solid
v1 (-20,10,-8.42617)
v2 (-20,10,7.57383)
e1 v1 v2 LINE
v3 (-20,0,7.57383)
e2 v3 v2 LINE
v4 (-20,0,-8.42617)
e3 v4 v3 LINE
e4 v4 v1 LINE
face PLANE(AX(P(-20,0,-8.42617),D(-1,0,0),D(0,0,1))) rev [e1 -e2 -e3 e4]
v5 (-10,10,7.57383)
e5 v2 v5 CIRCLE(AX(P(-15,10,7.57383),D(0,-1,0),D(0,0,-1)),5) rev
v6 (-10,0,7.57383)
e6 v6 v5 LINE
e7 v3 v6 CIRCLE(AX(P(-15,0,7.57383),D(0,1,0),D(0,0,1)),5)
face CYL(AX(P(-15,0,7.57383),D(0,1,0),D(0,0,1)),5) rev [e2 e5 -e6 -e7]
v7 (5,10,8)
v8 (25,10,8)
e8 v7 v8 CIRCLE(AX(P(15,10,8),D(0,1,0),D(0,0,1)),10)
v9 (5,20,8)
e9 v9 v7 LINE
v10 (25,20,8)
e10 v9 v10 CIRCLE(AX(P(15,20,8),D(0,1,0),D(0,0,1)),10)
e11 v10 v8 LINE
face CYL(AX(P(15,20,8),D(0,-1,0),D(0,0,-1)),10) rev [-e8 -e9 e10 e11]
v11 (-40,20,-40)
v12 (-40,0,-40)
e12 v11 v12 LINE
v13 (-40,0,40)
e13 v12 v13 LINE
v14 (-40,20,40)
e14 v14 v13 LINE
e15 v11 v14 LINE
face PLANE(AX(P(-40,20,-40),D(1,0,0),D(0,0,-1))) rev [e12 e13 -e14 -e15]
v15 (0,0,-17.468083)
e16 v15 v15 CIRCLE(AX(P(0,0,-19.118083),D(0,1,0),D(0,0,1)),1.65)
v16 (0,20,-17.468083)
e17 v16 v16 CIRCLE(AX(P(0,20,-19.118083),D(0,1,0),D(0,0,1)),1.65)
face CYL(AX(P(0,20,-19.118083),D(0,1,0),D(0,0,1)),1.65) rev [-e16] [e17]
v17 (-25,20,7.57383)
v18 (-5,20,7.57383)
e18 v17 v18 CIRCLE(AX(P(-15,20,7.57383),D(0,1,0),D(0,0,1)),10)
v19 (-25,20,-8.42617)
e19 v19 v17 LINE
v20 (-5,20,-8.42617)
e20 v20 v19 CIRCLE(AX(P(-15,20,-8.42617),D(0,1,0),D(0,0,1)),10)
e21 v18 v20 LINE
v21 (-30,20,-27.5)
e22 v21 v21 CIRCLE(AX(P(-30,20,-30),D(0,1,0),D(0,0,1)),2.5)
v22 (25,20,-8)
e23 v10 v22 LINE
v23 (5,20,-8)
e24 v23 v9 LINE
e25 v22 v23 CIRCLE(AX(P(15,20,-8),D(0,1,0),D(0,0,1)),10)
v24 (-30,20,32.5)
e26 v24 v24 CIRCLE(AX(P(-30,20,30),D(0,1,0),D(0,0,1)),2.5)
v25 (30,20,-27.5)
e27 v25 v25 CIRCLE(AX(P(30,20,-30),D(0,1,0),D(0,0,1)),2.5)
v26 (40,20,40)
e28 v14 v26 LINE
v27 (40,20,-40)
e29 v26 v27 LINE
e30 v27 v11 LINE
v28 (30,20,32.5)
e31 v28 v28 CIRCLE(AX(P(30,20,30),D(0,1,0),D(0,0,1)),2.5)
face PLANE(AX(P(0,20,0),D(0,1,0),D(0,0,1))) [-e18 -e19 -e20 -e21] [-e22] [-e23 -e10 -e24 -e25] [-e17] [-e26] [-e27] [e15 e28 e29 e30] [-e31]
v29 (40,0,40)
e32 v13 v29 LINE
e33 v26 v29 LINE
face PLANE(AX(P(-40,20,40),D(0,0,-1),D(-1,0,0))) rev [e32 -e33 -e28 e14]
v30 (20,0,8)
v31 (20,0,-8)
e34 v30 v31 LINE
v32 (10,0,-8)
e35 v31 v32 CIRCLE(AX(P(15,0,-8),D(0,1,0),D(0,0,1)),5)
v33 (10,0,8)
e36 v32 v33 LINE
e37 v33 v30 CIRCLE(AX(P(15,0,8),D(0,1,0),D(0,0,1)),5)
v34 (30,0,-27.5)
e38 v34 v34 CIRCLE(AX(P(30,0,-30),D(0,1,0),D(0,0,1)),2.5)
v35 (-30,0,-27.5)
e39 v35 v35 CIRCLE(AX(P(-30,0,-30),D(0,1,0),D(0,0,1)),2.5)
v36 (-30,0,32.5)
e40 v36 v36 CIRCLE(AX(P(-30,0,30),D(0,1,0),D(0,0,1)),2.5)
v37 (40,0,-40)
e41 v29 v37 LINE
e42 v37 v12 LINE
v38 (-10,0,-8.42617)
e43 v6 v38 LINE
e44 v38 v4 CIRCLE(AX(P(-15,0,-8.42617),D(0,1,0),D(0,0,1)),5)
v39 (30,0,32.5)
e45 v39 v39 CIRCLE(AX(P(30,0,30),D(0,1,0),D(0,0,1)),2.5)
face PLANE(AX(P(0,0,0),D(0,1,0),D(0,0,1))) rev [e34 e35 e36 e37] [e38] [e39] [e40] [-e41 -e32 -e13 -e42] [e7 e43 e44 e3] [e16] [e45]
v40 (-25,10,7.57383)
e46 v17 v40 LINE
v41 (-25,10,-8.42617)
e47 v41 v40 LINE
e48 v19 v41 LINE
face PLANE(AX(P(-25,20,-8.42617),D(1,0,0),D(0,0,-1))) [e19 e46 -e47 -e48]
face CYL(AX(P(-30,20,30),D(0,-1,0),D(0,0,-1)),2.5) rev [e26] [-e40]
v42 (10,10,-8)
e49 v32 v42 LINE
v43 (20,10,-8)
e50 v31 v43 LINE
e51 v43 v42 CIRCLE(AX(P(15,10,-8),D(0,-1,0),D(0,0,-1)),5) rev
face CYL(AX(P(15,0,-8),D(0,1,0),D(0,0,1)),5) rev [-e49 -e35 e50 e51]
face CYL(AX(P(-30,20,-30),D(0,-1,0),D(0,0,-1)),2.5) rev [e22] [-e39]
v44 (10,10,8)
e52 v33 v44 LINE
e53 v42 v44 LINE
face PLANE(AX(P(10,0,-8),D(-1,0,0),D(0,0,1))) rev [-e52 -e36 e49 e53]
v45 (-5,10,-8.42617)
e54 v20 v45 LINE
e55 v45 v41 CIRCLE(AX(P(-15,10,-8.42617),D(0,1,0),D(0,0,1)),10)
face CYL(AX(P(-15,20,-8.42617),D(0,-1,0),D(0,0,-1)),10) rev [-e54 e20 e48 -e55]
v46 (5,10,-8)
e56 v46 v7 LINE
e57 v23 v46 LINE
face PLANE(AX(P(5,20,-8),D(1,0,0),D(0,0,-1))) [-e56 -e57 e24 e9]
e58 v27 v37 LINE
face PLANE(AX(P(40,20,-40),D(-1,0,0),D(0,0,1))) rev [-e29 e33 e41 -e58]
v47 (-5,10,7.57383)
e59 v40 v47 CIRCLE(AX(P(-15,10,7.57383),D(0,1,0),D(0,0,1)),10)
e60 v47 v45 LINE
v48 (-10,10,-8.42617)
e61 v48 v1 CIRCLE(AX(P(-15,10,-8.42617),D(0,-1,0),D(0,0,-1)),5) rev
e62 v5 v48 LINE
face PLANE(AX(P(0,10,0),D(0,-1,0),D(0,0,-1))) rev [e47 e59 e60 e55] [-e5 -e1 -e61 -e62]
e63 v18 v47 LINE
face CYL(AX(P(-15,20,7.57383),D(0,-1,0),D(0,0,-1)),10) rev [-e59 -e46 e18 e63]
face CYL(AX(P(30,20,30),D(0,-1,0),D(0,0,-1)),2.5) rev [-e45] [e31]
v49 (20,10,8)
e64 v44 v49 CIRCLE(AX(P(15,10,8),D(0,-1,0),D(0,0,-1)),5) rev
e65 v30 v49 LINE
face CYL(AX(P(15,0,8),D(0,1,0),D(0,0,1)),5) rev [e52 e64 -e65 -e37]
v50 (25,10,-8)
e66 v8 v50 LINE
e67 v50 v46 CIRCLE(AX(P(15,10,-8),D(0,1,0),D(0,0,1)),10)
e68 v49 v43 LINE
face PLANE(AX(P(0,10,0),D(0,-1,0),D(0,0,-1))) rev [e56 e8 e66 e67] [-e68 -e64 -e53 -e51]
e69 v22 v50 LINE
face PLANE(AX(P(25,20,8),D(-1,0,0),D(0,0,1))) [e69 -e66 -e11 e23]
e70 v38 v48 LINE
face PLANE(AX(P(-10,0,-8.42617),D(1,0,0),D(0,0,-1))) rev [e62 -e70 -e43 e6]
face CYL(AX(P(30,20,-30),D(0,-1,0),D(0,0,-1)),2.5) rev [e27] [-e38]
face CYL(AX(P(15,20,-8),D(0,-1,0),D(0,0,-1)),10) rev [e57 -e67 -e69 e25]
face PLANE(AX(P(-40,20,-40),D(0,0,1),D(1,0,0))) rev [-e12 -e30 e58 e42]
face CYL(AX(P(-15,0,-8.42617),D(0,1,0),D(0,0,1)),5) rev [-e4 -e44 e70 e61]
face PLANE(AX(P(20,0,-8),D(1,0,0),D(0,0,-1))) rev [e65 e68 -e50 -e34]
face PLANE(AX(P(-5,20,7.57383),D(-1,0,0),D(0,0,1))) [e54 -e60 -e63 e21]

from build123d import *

# Parameters (mm, degrees)
IZIM1_W                     = 80
IZIM1_H                     = 80
IZIM1_R                     = 2.5
Y_KSEKLIK_EKSTR_ZYON1_DEPTH = 20
KES_EKSTR_ZYON2_DEPTH       = 61
KES_EKSTR_ZYON3_START       = 10
KES_EKSTR_ZYON3_DEPTH       = 10
M4X0_7_DI_LI_DELIK1_D       = 3.3


# Read off the part's stored shape, not the designer's step: Kes-Ekstrüzyon3
with BuildPart() as part:
    # Çizim1 → Yükseklik-Ekstrüzyon1 (new body)
    with BuildSketch(Plane(origin=(0, 0, 0), x_dir=(1, 0, 0), z_dir=(0, 1, 0))):
        Rectangle(IZIM1_W, IZIM1_H)
        with Locations(Location((-30, 30, 0), (0, 0, 270))):
            Circle(IZIM1_R, mode=Mode.SUBTRACT)
        with Locations(Location((30, 30, 0), (0, 0, 270))):
            Circle(IZIM1_R, mode=Mode.SUBTRACT)
        with Locations(Location((-30, -30, 0), (0, 0, 270))):
            Circle(IZIM1_R, mode=Mode.SUBTRACT)
        with Locations(Location((30, -30, 0), (0, 0, 270))):
            Circle(IZIM1_R, mode=Mode.SUBTRACT)
    extrude(amount=Y_KSEKLIK_EKSTR_ZYON1_DEPTH)

    # Çizim2 → Kes-Ekstrüzyon2 (cut, through all)
    with BuildSketch(Plane(origin=(0, 20, 0), x_dir=(1, 0, 0), z_dir=(0, 1, 0))):
        with BuildLine():
            Line((-10, 8.426169555), (-10, -7.573830445))
            ThreePointArc((-10, -7.573830445), (-15, -12.573830445), (-20, -7.573830445))
            Line((-20, -7.573830445), (-20, 8.426169555))
            ThreePointArc((-20, 8.426169555), (-15, 13.426169555), (-10, 8.426169555))
        make_face()
        with BuildLine():
            Line((20, 8), (20, -8))
            ThreePointArc((20, -8), (15, -13), (10, -8))
            Line((10, -8), (10, 8))
            ThreePointArc((10, 8), (15, 13), (20, 8))
        make_face()
    extrude(amount=-KES_EKSTR_ZYON2_DEPTH, mode=Mode.SUBTRACT)

    # Kes-Ekstrüzyon3 outline → Kes-Ekstrüzyon3 (cut)
    # profile 1 of 2: a face of its own
    with BuildSketch(Plane(origin=(0, 0, 0), x_dir=(1, 0, 0), z_dir=(0, 1, 0)).offset(KES_EKSTR_ZYON3_START)):
        with BuildLine():
            Line((-25, 8.426169555), (-25, -7.573830445))
            ThreePointArc((-25, -7.573830445), (-15, -17.573830445), (-5, -7.573830445))
            Line((-5, -7.573830445), (-5, 8.426169555))
            ThreePointArc((-5, 8.426169555), (-15, 18.426169555), (-25, 8.426169555))
        make_face()
        with BuildLine():
            ThreePointArc((-20, 8.426169555), (-15, 13.426169555), (-10, 8.426169555))
            Line((-10, 8.426169555), (-10, -7.573830445))
            ThreePointArc((-10, -7.573830445), (-15, -12.573830445), (-20, -7.573830445))
            Line((-20, -7.573830445), (-20, 8.426169555))
        make_face(mode=Mode.SUBTRACT)
    # profile 2 of 2: a face of its own
    with BuildSketch(Plane(origin=(0, 0, 0), x_dir=(1, 0, 0), z_dir=(0, 1, 0)).offset(KES_EKSTR_ZYON3_START)):
        with BuildLine():
            Line((25, -8), (25, 8))
            ThreePointArc((25, 8), (15, 18), (5, 8))
            Line((5, 8), (5, -8))
            ThreePointArc((5, -8), (15, -18), (25, -8))
        make_face()
        with BuildLine():
            ThreePointArc((10, 8), (15, 13), (20, 8))
            Line((20, 8), (20, -8))
            ThreePointArc((20, -8), (15, -13), (10, -8))
            Line((10, -8), (10, 8))
        make_face(mode=Mode.SUBTRACT)
    extrude(amount=KES_EKSTR_ZYON3_DEPTH, mode=Mode.SUBTRACT)

    # M4x0.7 Dişli Delik1 (through all)
    with Locations(Plane(origin=(0, 20, 0), x_dir=(1, 0, 0), z_dir=(0, 1, 0))):
        with Locations((0, 19.118083018)):
            Hole(M4X0_7_DI_LI_DELIK1_D / 2)


solid = part.part
